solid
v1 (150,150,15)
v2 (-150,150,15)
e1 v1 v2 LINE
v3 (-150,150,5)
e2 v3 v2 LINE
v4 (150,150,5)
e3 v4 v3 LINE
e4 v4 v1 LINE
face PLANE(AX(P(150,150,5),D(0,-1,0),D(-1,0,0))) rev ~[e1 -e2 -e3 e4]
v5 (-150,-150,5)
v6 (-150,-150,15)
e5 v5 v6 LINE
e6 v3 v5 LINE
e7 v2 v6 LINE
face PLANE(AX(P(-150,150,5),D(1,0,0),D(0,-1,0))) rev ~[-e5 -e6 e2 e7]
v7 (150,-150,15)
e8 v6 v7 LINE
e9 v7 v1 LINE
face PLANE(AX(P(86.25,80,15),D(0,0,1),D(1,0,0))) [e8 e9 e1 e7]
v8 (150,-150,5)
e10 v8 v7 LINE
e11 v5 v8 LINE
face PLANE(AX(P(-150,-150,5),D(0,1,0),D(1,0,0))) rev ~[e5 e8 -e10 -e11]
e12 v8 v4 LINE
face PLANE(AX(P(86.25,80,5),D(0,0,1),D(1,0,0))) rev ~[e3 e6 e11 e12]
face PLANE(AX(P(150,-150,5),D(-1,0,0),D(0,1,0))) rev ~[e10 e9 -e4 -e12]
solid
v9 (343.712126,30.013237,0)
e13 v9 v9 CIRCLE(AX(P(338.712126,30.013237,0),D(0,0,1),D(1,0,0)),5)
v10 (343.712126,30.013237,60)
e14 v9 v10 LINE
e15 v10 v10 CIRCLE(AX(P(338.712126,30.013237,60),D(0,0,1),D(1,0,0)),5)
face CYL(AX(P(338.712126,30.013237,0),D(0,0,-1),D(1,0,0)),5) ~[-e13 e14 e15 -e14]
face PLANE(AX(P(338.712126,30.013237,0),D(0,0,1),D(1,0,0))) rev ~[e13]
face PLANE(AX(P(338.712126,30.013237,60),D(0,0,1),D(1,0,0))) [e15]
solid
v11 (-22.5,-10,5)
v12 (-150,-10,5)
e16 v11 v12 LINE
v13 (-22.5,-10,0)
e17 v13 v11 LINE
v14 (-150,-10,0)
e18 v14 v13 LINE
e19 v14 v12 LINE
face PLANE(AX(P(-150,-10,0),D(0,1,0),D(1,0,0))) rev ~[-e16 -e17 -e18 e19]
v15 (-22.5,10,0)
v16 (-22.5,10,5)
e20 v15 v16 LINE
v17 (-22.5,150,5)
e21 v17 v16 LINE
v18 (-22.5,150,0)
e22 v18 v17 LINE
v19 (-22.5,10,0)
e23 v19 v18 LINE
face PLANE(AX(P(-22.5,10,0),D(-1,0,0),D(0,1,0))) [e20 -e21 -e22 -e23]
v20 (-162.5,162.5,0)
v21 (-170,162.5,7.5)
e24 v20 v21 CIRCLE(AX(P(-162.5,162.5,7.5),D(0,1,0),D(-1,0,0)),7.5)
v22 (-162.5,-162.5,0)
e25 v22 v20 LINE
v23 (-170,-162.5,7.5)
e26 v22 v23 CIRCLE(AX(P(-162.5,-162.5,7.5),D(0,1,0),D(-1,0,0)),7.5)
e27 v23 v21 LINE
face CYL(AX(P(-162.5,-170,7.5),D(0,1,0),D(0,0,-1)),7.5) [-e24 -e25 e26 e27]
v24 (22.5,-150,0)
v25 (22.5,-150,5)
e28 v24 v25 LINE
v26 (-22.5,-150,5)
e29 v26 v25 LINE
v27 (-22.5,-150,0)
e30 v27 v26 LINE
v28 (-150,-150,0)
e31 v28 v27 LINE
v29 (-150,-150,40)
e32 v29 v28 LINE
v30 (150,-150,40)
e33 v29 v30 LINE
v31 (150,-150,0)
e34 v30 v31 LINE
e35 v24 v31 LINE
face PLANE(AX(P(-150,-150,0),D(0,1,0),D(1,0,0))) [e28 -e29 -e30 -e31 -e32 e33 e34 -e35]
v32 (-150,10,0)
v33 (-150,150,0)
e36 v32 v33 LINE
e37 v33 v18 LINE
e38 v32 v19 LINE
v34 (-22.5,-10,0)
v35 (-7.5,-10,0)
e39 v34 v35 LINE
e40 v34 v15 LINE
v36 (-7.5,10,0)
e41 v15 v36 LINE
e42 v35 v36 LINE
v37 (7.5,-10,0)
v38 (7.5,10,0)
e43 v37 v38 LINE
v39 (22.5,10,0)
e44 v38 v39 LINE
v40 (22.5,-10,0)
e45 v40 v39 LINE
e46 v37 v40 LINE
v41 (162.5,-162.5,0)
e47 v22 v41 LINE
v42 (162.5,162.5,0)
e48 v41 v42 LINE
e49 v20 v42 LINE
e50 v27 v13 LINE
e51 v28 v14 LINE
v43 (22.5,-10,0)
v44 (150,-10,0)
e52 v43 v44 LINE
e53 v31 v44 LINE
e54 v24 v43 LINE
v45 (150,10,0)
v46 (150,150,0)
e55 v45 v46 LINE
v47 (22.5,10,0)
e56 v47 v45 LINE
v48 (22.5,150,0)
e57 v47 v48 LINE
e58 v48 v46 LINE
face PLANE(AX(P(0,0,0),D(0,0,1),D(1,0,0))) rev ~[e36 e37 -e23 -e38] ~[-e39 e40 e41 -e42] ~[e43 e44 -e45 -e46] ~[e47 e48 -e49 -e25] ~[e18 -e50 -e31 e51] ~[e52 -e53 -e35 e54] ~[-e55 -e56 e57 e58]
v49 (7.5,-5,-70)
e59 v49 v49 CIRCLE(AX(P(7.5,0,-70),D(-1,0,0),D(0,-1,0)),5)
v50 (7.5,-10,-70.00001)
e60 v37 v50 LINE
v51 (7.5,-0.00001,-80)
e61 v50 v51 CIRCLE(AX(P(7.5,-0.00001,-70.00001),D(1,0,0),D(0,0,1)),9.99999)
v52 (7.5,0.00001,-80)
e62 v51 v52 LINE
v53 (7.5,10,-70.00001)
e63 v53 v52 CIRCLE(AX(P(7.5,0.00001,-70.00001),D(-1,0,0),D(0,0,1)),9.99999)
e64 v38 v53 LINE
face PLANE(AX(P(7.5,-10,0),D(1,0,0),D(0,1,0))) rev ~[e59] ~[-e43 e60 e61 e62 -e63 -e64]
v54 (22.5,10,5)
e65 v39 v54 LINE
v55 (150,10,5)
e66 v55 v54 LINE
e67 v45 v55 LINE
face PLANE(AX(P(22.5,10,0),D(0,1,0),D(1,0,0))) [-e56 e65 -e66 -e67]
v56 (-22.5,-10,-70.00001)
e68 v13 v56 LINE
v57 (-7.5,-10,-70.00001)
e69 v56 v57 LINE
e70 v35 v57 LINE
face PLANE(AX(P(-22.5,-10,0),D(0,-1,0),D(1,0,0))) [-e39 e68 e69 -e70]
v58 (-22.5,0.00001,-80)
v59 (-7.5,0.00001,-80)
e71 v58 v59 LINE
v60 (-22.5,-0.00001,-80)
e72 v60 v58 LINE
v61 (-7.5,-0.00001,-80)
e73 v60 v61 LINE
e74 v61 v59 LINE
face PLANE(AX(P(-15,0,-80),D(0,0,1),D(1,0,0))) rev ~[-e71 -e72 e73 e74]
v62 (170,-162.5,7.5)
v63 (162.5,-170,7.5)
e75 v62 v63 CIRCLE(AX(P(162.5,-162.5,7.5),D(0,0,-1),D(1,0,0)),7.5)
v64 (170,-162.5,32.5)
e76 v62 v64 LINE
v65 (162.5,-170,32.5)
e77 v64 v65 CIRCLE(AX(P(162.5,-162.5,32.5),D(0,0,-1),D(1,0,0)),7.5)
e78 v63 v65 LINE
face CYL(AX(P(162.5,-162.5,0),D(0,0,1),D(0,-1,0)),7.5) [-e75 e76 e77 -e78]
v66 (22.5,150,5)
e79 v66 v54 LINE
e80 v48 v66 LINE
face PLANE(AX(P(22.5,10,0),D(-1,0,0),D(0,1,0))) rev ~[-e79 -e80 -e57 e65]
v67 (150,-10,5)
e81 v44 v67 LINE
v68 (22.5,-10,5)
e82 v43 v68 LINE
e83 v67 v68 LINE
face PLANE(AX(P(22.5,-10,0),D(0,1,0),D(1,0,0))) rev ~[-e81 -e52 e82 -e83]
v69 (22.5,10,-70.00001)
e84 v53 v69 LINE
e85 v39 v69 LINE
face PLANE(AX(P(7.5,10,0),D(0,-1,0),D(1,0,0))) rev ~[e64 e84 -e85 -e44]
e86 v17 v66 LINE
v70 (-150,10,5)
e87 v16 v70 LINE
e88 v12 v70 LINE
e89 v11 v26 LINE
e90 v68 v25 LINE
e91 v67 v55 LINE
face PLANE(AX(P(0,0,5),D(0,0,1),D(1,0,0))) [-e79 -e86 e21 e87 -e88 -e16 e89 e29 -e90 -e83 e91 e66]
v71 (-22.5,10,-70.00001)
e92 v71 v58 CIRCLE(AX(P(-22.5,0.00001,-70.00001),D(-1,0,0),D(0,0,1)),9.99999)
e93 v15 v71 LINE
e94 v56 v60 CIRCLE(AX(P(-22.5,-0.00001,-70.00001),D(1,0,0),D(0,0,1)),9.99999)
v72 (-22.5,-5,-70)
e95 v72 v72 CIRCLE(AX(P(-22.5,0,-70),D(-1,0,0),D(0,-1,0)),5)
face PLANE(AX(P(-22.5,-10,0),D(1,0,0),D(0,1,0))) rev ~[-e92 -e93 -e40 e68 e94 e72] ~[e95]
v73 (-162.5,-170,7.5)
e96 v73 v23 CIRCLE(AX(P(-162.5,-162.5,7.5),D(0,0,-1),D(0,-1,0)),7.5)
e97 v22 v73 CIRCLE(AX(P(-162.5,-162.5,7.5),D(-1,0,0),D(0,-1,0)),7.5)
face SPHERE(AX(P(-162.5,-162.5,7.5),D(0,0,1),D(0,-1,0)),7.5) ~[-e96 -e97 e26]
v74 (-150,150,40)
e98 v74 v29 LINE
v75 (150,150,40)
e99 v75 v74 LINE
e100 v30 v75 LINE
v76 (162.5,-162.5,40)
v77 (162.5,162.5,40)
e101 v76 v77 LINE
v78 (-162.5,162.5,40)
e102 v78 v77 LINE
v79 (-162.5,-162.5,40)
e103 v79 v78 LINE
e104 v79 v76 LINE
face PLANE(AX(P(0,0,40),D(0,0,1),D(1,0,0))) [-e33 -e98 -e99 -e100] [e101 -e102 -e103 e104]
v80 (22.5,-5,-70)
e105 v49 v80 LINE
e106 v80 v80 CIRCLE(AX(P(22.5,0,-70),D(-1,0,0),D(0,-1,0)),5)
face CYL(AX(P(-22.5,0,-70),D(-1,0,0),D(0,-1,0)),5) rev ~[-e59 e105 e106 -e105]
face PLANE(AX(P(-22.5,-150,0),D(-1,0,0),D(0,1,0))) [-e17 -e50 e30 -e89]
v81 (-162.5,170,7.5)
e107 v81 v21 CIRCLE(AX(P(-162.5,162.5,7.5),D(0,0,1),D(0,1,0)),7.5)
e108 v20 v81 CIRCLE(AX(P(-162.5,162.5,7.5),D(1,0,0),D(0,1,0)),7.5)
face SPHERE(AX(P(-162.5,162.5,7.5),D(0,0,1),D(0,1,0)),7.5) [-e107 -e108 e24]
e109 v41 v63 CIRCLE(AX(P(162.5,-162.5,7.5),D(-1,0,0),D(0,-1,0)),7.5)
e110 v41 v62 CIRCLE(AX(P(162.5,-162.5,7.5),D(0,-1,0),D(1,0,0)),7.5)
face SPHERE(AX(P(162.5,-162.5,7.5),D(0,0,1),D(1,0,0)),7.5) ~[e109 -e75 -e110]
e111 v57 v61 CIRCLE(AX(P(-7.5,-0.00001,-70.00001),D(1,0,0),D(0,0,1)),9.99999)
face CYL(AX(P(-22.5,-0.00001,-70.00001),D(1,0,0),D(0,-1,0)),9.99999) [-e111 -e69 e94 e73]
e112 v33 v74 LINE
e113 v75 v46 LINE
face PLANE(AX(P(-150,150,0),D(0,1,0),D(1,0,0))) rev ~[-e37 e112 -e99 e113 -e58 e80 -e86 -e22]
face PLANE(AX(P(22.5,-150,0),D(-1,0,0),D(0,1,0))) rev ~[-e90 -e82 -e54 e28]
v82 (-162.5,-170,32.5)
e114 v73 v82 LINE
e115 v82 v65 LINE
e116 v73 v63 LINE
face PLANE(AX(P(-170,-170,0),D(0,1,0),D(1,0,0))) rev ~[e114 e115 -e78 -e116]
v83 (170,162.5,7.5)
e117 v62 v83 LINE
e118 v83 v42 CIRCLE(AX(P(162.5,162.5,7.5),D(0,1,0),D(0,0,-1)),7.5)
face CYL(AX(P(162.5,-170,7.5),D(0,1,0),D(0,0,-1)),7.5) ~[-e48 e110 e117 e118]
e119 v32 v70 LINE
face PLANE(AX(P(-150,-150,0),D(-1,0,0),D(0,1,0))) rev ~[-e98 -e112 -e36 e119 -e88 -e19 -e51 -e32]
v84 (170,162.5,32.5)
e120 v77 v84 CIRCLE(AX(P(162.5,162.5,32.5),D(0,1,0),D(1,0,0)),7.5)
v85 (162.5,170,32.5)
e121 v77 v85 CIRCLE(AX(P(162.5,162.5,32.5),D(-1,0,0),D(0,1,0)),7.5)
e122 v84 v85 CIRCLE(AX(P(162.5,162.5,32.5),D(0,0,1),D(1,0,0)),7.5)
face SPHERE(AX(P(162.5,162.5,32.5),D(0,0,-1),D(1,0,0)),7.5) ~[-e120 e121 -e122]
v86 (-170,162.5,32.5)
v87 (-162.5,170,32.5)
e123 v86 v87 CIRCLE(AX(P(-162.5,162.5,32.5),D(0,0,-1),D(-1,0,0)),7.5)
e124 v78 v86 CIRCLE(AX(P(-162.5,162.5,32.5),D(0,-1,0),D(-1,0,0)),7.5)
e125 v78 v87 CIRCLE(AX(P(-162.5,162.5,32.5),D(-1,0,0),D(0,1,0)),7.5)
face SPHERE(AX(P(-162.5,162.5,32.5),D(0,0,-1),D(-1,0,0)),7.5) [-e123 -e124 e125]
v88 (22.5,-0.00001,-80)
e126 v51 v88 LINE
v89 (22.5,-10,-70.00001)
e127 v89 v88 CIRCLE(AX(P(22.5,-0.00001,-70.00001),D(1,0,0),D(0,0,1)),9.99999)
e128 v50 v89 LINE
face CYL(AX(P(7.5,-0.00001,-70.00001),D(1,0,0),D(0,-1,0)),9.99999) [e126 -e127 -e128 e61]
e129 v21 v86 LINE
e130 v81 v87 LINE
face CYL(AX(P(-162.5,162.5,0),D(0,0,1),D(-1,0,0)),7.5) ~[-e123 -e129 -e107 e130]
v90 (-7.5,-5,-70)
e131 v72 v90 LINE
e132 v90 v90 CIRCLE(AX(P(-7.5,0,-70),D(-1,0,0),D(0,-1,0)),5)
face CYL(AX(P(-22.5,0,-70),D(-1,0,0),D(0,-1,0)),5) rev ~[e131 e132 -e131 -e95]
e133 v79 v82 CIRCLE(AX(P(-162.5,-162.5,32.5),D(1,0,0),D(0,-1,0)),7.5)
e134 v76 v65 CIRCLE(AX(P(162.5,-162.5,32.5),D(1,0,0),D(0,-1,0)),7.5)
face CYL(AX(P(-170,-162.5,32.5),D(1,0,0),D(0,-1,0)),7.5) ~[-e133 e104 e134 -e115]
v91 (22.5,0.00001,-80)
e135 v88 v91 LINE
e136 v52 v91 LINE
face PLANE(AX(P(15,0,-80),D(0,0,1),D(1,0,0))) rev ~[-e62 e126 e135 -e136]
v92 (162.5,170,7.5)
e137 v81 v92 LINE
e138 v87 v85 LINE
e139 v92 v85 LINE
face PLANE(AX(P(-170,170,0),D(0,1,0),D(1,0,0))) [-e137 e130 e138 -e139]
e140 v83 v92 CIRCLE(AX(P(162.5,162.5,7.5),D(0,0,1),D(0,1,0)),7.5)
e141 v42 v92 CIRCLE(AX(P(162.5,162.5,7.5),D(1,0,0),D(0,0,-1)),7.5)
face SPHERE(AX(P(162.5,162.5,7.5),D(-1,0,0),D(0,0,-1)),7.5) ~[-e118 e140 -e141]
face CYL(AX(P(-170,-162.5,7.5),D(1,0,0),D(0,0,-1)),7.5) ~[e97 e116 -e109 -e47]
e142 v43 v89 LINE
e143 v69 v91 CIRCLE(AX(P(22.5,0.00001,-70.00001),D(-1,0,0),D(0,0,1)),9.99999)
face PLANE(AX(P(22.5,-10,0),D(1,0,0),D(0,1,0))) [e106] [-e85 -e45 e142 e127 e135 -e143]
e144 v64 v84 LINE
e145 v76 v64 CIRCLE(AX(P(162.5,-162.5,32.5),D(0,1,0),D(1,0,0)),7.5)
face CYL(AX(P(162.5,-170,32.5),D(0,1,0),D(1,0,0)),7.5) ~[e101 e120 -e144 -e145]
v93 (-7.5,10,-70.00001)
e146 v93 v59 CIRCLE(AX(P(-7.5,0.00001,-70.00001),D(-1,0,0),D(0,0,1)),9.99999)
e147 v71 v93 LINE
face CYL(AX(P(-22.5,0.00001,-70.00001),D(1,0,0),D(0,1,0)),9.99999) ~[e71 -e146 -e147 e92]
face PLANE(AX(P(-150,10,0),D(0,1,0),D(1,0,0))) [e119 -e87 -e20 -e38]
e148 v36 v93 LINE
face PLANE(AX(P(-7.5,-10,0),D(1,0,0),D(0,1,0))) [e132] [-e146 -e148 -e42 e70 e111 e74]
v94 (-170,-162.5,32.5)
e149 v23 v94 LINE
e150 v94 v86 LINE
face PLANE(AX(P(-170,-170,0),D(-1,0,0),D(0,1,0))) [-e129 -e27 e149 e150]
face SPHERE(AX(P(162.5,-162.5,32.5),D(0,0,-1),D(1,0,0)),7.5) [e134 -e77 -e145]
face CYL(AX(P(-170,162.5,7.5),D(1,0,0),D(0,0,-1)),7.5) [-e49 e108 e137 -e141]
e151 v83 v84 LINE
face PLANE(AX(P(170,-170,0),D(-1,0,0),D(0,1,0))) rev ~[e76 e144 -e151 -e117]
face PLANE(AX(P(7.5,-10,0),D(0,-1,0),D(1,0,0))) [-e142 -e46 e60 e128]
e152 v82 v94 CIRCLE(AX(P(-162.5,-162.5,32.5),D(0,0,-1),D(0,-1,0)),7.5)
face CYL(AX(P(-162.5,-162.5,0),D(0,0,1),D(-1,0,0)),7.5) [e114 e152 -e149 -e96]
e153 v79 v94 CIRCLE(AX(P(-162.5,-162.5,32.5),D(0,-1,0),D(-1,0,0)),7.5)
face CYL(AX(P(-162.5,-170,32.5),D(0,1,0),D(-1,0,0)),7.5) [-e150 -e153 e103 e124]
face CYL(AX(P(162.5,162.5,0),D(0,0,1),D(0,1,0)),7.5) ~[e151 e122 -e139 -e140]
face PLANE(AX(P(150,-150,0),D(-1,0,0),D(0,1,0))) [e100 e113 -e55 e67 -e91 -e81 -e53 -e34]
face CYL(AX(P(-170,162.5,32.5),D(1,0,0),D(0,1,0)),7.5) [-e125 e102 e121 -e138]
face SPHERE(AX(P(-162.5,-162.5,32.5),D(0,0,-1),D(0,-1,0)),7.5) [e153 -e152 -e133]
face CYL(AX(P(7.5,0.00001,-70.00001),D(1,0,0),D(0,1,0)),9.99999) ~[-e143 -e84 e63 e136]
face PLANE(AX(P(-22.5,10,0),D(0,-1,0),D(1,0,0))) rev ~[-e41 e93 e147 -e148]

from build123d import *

# Parameters (mm, degrees)
F0_W      = 340
F0_H      = 340
F0_W_2    = 300
F0_H_2    = 300
F1_DEPTH  = 40
F2_DEPTH  = 5
F3_W      = 15
F3_H      = 20
F4_DEPTH  = 80
F5_R      = 9.99999
F6_R      = 7.5
F7_R      = 5
F8_DEPTH  = 45
F0_R      = 5
F10_DEPTH = 60
F3_W_2    = 127.5
F3_H_2    = 140
F11_DEPTH = 60.001
F12_W     = 127.5
F12_H     = 140
F13_DEPTH = 10


# Not quite as in the source:
# - a fillet or chamfer is up to 0.001 mm smaller than in the source, because OpenCascade refuses the exact size


with BuildPart() as f1:
    # F0 (on Top) → F1 (new body)
    with BuildSketch(Plane.XY):
        Rectangle(F0_W, F0_H)
        Rectangle(F0_W_2, F0_H_2, mode=Mode.SUBTRACT)
    extrude(amount=F1_DEPTH)

    # F0 (on Top) → F2 (join)
    with BuildSketch(Plane.XY):
        Rectangle(F0_W_2, F0_H_2)
    extrude(amount=F2_DEPTH)

    # F3 (on face) → F4 (join)
    with BuildSketch(Plane.XY):
        with Locations((15, 0)):
            Rectangle(F3_W, F3_H)
        with Locations((-15, 0)):
            Rectangle(F3_W, F3_H)
    extrude(amount=-F4_DEPTH)

    # F5 (radius 10 in the source; OpenCascade refuses exactly that, so slightly less here)
    f5_edges = [f1.edges().sort_by_distance(p)[0] for p in [
        (-15, -10, -80),
        (-15, 10, -80),
        (15, -10, -80),
        (15, 10, -80),
    ]]
    fillet(f5_edges, radius=F5_R)

    # F6
    f6_edges = [f1.edges().sort_by_distance(p)[0] for p in [
        (-170, -170, 20),
        (170, -170, 20),
        (-170, 170, 20),
        (0, 170, 0),
        (170, 0, 0),
        (170, 170, 20),
        (170, 0, 40),
        (0, -170, 40),
        (0, -170, 0),
        (-170, 0, 40),
        (-170, 0, 0),
        (0, 170, 40),
    ]]
    fillet(f6_edges, radius=F6_R)


with BuildPart() as f8:
    # F7 (on face) → F8 (new body)
    with BuildSketch(Plane(origin=(-22.5, 0, 0), x_dir=(0, -1, 0), z_dir=(-1, 0, 0))):
        with Locations((0, -70)):
            Circle(F7_R)
    extrude(amount=-F8_DEPTH)


with BuildPart() as f1_1:
    add(f1.part)

    # F9: cut F8
    add(f8.part, mode=Mode.SUBTRACT)

    # F3 (on face) → F11 (cut, through all)
    with BuildSketch(Plane.XY):
        with Locations((-86.25, 80)):
            Rectangle(F3_W_2, F3_H_2)
        with Locations((86.25, 80)):
            Rectangle(F3_W_2, F3_H_2)
        with Locations((86.25, -80)):
            Rectangle(F3_W_2, F3_H_2)
        with Locations((-86.25, -80)):
            Rectangle(F3_W_2, F3_H_2)
    extrude(amount=F11_DEPTH, mode=Mode.SUBTRACT)


with BuildPart() as f10:
    # F0 (on Top) → F10 (new body)
    with BuildSketch(Plane.XY):
        with Locations((338.7121260166, 30.0132371485)):
            Circle(F0_R)
    extrude(amount=F10_DEPTH)


with BuildPart() as f13:
    # F12 (on face) → F13 (new body)
    with BuildSketch(Plane.XY.offset(5)):
        with Locations((86.25, 80)):
            Rectangle(F12_W, F12_H)
        Polygon((22.5, 10), (22.5, 150), (-22.5, 150), (-22.5, 10), (-150, 10), (-150, -10), (-22.5, -10), (-22.5, -150), (22.5, -150), (22.5, -10), (150, -10), (150, 10), align=None)
        with Locations((-86.25, 80)):
            Rectangle(F12_W, F12_H)
        with Locations((86.25, -80)):
            Rectangle(F12_W, F12_H)
        with Locations((-86.25, -80)):
            Rectangle(F12_W, F12_H)
    extrude(amount=F13_DEPTH)


solid = Compound([f1_1.part, f10.part, f13.part])
